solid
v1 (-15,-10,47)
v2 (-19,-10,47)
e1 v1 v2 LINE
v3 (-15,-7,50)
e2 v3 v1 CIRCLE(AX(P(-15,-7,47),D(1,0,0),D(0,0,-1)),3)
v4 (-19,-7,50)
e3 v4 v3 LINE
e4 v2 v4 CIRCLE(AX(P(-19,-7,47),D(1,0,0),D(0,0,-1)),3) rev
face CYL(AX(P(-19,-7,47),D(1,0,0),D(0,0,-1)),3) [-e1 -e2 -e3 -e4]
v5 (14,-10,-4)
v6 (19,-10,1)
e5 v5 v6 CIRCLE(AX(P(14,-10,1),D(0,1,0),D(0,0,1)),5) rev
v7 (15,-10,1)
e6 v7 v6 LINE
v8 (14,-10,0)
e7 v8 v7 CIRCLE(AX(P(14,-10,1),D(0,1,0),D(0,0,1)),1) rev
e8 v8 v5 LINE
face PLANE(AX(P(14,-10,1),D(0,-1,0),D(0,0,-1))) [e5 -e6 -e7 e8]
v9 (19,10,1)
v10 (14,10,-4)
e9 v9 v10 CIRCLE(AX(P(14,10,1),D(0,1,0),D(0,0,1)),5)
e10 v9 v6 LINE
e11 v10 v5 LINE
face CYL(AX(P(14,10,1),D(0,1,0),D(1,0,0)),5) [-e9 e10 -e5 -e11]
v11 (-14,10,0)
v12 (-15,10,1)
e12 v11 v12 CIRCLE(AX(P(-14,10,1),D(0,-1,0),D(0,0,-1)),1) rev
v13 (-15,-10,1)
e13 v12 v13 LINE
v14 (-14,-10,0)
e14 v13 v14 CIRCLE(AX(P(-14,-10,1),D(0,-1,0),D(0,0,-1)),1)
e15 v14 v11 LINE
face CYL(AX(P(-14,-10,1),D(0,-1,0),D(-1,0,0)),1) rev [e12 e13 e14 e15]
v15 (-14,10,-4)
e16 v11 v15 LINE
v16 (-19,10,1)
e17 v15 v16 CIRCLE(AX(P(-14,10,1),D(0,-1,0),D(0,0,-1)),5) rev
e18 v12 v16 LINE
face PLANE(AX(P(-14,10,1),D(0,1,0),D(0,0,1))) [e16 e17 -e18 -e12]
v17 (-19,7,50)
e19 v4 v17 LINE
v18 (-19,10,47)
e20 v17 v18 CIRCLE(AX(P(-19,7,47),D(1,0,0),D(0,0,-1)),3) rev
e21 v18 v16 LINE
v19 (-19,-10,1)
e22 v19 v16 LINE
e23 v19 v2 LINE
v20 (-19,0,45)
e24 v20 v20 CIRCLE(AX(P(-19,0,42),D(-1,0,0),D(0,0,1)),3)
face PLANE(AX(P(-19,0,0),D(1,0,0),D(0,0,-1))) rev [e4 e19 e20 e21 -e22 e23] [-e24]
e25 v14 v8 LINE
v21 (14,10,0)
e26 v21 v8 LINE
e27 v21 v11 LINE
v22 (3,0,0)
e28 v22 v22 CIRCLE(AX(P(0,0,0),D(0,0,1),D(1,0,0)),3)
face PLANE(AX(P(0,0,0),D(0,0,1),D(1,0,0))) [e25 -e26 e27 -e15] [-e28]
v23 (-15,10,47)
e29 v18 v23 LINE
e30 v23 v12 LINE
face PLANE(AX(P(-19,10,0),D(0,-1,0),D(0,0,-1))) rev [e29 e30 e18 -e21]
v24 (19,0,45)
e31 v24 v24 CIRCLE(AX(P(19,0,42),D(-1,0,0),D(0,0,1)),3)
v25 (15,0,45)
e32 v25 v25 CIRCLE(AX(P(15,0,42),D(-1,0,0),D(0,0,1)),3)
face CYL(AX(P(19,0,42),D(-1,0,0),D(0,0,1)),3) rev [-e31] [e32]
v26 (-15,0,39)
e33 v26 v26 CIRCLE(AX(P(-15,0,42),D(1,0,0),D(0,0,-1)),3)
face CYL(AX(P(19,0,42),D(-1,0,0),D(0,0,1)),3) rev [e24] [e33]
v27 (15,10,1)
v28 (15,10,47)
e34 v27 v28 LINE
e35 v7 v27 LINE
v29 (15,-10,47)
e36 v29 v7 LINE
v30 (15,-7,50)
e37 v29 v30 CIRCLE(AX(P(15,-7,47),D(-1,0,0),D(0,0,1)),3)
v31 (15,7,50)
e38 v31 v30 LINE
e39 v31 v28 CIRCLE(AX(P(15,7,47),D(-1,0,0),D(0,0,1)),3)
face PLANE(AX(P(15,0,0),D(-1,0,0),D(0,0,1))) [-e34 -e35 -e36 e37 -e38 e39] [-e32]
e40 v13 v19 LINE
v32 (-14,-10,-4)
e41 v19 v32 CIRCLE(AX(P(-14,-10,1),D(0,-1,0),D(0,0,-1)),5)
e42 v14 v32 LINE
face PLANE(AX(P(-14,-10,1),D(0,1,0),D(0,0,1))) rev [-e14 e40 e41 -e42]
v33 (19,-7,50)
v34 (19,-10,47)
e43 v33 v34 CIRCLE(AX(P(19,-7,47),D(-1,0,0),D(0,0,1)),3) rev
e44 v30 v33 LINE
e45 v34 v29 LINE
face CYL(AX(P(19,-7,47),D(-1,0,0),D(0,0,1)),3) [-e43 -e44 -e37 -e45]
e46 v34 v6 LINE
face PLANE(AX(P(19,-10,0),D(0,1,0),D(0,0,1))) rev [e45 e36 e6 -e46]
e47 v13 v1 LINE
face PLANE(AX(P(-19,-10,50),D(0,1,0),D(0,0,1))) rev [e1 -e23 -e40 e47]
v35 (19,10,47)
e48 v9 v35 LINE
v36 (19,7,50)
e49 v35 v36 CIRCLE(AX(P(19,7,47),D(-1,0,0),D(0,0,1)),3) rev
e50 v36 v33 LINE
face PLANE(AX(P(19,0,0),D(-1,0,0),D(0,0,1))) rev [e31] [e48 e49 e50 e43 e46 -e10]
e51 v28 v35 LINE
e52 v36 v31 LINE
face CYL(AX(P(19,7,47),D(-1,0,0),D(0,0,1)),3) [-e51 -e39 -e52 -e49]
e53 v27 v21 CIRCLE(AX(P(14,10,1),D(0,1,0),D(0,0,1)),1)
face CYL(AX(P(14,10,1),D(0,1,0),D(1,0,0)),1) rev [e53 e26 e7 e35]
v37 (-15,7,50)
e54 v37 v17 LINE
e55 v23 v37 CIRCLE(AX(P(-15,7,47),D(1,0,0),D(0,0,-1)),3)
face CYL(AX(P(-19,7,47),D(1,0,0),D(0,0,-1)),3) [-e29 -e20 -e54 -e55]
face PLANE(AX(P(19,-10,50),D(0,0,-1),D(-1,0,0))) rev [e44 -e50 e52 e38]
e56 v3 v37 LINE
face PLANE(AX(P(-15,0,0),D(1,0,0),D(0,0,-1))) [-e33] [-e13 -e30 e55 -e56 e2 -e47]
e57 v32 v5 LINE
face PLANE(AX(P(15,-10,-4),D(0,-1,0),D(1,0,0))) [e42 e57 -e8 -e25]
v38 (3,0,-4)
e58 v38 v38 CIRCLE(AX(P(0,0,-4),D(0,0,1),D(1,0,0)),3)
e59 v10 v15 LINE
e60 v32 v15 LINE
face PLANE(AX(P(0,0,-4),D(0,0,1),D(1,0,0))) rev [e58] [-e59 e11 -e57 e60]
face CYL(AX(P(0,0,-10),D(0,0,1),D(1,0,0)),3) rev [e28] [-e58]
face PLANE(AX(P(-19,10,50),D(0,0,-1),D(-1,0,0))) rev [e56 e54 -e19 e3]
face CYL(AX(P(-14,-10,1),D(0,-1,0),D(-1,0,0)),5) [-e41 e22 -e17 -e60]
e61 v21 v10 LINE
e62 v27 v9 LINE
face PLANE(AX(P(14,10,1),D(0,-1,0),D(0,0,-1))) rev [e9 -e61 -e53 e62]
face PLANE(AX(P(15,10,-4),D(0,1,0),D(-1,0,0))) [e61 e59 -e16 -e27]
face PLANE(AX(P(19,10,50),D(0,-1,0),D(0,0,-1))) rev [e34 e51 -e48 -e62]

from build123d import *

# Parameters (mm, degrees)
SKETCH_1_W                         = 30
SKETCH_1_H                         = 20
SM_BASE_FLANGE_1_DEPTH             = 4
SM_EDGE_FLANGE_1_STRIP_W           = 18
SM_EDGE_FLANGE_1_STRIP_H           = 4
SM_EDGE_FLANGE_1_STRIP_CUT_DEPTH   = 20
SM_EDGE_FLANGE_1_STRIP_2_W         = 18
SM_EDGE_FLANGE_1_STRIP_2_H         = 4
SM_EDGE_FLANGE_1_STRIP_CUT_2_DEPTH = 20
SM_EDGE_FLANGE_1_DEPTH             = 20
SM_EDGE_FLANGE_1_BEND_DEPTH        = 20
FILLET_1_R                         = 3
SKETCH_12_R                        = 3
CUT_EXTRUDE_1_DEPTH                = 10
SKETCH_13_R                        = 3
CUT_EXTRUDE_2_DEPTH                = 64.592452382


# Sheet-metal steps are written as plain solids
with BuildPart() as part:
    # Sketch 1 → 基体-法兰1 (new body)
    with BuildSketch(Plane.XY):
        Rectangle(SKETCH_1_W, SKETCH_1_H)
    extrude(amount=-SM_BASE_FLANGE_1_DEPTH)

    # 边线-法兰1 strip (across the edge) → 边线-法兰1 strip cut (cut)
    with BuildSketch(Plane(origin=(-15, 10, 0), x_dir=(1, 0, 0), z_dir=(0, -1, 0))):
        with Locations((-8, -2)):
            Rectangle(SM_EDGE_FLANGE_1_STRIP_W, SM_EDGE_FLANGE_1_STRIP_H)
    extrude(amount=SM_EDGE_FLANGE_1_STRIP_CUT_DEPTH, mode=Mode.SUBTRACT)

    # 边线-法兰1 strip 2 (across the edge) → 边线-法兰1 strip cut 2 (cut)
    with BuildSketch(Plane(origin=(15, -10, 0), x_dir=(-1, 0, 0), z_dir=(0, 1, 0))):
        with Locations((-8, -2)):
            Rectangle(SM_EDGE_FLANGE_1_STRIP_2_W, SM_EDGE_FLANGE_1_STRIP_2_H)
    extrude(amount=SM_EDGE_FLANGE_1_STRIP_CUT_2_DEPTH, mode=Mode.SUBTRACT)

    # 边线-法兰1 section (across the edge) → 边线-法兰1 (add)
    with BuildSketch(Plane(origin=(-15, 10, 0), x_dir=(1, 0, 0), z_dir=(0, -1, 0))):
        with BuildLine():
            Line((-4, 1), (-4, 50))
            Line((-4, 50), (0, 50))
            Line((0, 50), (0, 1))
            ThreePointArc((0, 1), (0.292893219, 0.292893219), (1, 0))
            Line((1, 0), (1, -4))
            ThreePointArc((1, -4), (-2.535533906, -2.535533906), (-4, 1))
        make_face()
    extrude(amount=SM_EDGE_FLANGE_1_DEPTH)

    # 边线-法兰1 section 2 (across the edge) → 边线-法兰1 bend (add)
    with BuildSketch(Plane(origin=(15, -10, 0), x_dir=(-1, 0, 0), z_dir=(0, 1, 0))):
        with BuildLine():
            Line((-4, 1), (-4, 50))
            Line((-4, 50), (0, 50))
            Line((0, 50), (0, 1))
            ThreePointArc((0, 1), (0.292893219, 0.292893219), (1, 0))
            Line((1, 0), (1, -4))
            ThreePointArc((1, -4), (-2.535533906, -2.535533906), (-4, 1))
        make_face()
    extrude(amount=SM_EDGE_FLANGE_1_BEND_DEPTH)

    # 圆角1
    fillet_1_edges = [part.edges().sort_by_distance(p)[0] for p in [
        (-17, 10, 50),
        (-17, -10, 50),
        (17, -10, 50),
        (17, 10, 50),
    ]]
    fillet(fillet_1_edges, radius=FILLET_1_R)

    # 草图12 → 切除-拉伸1 (cut)
    with BuildSketch(Plane.XY):
        Circle(SKETCH_12_R)
    extrude(amount=-CUT_EXTRUDE_1_DEPTH, mode=Mode.SUBTRACT)

    # 草图13 → 切除-拉伸2 (cut, through all)
    with BuildSketch(Plane.ZY.offset(19)):
        with Locations((42, 0)):
            Circle(SKETCH_13_R)
    extrude(amount=-CUT_EXTRUDE_2_DEPTH, mode=Mode.SUBTRACT)


solid = part.part
